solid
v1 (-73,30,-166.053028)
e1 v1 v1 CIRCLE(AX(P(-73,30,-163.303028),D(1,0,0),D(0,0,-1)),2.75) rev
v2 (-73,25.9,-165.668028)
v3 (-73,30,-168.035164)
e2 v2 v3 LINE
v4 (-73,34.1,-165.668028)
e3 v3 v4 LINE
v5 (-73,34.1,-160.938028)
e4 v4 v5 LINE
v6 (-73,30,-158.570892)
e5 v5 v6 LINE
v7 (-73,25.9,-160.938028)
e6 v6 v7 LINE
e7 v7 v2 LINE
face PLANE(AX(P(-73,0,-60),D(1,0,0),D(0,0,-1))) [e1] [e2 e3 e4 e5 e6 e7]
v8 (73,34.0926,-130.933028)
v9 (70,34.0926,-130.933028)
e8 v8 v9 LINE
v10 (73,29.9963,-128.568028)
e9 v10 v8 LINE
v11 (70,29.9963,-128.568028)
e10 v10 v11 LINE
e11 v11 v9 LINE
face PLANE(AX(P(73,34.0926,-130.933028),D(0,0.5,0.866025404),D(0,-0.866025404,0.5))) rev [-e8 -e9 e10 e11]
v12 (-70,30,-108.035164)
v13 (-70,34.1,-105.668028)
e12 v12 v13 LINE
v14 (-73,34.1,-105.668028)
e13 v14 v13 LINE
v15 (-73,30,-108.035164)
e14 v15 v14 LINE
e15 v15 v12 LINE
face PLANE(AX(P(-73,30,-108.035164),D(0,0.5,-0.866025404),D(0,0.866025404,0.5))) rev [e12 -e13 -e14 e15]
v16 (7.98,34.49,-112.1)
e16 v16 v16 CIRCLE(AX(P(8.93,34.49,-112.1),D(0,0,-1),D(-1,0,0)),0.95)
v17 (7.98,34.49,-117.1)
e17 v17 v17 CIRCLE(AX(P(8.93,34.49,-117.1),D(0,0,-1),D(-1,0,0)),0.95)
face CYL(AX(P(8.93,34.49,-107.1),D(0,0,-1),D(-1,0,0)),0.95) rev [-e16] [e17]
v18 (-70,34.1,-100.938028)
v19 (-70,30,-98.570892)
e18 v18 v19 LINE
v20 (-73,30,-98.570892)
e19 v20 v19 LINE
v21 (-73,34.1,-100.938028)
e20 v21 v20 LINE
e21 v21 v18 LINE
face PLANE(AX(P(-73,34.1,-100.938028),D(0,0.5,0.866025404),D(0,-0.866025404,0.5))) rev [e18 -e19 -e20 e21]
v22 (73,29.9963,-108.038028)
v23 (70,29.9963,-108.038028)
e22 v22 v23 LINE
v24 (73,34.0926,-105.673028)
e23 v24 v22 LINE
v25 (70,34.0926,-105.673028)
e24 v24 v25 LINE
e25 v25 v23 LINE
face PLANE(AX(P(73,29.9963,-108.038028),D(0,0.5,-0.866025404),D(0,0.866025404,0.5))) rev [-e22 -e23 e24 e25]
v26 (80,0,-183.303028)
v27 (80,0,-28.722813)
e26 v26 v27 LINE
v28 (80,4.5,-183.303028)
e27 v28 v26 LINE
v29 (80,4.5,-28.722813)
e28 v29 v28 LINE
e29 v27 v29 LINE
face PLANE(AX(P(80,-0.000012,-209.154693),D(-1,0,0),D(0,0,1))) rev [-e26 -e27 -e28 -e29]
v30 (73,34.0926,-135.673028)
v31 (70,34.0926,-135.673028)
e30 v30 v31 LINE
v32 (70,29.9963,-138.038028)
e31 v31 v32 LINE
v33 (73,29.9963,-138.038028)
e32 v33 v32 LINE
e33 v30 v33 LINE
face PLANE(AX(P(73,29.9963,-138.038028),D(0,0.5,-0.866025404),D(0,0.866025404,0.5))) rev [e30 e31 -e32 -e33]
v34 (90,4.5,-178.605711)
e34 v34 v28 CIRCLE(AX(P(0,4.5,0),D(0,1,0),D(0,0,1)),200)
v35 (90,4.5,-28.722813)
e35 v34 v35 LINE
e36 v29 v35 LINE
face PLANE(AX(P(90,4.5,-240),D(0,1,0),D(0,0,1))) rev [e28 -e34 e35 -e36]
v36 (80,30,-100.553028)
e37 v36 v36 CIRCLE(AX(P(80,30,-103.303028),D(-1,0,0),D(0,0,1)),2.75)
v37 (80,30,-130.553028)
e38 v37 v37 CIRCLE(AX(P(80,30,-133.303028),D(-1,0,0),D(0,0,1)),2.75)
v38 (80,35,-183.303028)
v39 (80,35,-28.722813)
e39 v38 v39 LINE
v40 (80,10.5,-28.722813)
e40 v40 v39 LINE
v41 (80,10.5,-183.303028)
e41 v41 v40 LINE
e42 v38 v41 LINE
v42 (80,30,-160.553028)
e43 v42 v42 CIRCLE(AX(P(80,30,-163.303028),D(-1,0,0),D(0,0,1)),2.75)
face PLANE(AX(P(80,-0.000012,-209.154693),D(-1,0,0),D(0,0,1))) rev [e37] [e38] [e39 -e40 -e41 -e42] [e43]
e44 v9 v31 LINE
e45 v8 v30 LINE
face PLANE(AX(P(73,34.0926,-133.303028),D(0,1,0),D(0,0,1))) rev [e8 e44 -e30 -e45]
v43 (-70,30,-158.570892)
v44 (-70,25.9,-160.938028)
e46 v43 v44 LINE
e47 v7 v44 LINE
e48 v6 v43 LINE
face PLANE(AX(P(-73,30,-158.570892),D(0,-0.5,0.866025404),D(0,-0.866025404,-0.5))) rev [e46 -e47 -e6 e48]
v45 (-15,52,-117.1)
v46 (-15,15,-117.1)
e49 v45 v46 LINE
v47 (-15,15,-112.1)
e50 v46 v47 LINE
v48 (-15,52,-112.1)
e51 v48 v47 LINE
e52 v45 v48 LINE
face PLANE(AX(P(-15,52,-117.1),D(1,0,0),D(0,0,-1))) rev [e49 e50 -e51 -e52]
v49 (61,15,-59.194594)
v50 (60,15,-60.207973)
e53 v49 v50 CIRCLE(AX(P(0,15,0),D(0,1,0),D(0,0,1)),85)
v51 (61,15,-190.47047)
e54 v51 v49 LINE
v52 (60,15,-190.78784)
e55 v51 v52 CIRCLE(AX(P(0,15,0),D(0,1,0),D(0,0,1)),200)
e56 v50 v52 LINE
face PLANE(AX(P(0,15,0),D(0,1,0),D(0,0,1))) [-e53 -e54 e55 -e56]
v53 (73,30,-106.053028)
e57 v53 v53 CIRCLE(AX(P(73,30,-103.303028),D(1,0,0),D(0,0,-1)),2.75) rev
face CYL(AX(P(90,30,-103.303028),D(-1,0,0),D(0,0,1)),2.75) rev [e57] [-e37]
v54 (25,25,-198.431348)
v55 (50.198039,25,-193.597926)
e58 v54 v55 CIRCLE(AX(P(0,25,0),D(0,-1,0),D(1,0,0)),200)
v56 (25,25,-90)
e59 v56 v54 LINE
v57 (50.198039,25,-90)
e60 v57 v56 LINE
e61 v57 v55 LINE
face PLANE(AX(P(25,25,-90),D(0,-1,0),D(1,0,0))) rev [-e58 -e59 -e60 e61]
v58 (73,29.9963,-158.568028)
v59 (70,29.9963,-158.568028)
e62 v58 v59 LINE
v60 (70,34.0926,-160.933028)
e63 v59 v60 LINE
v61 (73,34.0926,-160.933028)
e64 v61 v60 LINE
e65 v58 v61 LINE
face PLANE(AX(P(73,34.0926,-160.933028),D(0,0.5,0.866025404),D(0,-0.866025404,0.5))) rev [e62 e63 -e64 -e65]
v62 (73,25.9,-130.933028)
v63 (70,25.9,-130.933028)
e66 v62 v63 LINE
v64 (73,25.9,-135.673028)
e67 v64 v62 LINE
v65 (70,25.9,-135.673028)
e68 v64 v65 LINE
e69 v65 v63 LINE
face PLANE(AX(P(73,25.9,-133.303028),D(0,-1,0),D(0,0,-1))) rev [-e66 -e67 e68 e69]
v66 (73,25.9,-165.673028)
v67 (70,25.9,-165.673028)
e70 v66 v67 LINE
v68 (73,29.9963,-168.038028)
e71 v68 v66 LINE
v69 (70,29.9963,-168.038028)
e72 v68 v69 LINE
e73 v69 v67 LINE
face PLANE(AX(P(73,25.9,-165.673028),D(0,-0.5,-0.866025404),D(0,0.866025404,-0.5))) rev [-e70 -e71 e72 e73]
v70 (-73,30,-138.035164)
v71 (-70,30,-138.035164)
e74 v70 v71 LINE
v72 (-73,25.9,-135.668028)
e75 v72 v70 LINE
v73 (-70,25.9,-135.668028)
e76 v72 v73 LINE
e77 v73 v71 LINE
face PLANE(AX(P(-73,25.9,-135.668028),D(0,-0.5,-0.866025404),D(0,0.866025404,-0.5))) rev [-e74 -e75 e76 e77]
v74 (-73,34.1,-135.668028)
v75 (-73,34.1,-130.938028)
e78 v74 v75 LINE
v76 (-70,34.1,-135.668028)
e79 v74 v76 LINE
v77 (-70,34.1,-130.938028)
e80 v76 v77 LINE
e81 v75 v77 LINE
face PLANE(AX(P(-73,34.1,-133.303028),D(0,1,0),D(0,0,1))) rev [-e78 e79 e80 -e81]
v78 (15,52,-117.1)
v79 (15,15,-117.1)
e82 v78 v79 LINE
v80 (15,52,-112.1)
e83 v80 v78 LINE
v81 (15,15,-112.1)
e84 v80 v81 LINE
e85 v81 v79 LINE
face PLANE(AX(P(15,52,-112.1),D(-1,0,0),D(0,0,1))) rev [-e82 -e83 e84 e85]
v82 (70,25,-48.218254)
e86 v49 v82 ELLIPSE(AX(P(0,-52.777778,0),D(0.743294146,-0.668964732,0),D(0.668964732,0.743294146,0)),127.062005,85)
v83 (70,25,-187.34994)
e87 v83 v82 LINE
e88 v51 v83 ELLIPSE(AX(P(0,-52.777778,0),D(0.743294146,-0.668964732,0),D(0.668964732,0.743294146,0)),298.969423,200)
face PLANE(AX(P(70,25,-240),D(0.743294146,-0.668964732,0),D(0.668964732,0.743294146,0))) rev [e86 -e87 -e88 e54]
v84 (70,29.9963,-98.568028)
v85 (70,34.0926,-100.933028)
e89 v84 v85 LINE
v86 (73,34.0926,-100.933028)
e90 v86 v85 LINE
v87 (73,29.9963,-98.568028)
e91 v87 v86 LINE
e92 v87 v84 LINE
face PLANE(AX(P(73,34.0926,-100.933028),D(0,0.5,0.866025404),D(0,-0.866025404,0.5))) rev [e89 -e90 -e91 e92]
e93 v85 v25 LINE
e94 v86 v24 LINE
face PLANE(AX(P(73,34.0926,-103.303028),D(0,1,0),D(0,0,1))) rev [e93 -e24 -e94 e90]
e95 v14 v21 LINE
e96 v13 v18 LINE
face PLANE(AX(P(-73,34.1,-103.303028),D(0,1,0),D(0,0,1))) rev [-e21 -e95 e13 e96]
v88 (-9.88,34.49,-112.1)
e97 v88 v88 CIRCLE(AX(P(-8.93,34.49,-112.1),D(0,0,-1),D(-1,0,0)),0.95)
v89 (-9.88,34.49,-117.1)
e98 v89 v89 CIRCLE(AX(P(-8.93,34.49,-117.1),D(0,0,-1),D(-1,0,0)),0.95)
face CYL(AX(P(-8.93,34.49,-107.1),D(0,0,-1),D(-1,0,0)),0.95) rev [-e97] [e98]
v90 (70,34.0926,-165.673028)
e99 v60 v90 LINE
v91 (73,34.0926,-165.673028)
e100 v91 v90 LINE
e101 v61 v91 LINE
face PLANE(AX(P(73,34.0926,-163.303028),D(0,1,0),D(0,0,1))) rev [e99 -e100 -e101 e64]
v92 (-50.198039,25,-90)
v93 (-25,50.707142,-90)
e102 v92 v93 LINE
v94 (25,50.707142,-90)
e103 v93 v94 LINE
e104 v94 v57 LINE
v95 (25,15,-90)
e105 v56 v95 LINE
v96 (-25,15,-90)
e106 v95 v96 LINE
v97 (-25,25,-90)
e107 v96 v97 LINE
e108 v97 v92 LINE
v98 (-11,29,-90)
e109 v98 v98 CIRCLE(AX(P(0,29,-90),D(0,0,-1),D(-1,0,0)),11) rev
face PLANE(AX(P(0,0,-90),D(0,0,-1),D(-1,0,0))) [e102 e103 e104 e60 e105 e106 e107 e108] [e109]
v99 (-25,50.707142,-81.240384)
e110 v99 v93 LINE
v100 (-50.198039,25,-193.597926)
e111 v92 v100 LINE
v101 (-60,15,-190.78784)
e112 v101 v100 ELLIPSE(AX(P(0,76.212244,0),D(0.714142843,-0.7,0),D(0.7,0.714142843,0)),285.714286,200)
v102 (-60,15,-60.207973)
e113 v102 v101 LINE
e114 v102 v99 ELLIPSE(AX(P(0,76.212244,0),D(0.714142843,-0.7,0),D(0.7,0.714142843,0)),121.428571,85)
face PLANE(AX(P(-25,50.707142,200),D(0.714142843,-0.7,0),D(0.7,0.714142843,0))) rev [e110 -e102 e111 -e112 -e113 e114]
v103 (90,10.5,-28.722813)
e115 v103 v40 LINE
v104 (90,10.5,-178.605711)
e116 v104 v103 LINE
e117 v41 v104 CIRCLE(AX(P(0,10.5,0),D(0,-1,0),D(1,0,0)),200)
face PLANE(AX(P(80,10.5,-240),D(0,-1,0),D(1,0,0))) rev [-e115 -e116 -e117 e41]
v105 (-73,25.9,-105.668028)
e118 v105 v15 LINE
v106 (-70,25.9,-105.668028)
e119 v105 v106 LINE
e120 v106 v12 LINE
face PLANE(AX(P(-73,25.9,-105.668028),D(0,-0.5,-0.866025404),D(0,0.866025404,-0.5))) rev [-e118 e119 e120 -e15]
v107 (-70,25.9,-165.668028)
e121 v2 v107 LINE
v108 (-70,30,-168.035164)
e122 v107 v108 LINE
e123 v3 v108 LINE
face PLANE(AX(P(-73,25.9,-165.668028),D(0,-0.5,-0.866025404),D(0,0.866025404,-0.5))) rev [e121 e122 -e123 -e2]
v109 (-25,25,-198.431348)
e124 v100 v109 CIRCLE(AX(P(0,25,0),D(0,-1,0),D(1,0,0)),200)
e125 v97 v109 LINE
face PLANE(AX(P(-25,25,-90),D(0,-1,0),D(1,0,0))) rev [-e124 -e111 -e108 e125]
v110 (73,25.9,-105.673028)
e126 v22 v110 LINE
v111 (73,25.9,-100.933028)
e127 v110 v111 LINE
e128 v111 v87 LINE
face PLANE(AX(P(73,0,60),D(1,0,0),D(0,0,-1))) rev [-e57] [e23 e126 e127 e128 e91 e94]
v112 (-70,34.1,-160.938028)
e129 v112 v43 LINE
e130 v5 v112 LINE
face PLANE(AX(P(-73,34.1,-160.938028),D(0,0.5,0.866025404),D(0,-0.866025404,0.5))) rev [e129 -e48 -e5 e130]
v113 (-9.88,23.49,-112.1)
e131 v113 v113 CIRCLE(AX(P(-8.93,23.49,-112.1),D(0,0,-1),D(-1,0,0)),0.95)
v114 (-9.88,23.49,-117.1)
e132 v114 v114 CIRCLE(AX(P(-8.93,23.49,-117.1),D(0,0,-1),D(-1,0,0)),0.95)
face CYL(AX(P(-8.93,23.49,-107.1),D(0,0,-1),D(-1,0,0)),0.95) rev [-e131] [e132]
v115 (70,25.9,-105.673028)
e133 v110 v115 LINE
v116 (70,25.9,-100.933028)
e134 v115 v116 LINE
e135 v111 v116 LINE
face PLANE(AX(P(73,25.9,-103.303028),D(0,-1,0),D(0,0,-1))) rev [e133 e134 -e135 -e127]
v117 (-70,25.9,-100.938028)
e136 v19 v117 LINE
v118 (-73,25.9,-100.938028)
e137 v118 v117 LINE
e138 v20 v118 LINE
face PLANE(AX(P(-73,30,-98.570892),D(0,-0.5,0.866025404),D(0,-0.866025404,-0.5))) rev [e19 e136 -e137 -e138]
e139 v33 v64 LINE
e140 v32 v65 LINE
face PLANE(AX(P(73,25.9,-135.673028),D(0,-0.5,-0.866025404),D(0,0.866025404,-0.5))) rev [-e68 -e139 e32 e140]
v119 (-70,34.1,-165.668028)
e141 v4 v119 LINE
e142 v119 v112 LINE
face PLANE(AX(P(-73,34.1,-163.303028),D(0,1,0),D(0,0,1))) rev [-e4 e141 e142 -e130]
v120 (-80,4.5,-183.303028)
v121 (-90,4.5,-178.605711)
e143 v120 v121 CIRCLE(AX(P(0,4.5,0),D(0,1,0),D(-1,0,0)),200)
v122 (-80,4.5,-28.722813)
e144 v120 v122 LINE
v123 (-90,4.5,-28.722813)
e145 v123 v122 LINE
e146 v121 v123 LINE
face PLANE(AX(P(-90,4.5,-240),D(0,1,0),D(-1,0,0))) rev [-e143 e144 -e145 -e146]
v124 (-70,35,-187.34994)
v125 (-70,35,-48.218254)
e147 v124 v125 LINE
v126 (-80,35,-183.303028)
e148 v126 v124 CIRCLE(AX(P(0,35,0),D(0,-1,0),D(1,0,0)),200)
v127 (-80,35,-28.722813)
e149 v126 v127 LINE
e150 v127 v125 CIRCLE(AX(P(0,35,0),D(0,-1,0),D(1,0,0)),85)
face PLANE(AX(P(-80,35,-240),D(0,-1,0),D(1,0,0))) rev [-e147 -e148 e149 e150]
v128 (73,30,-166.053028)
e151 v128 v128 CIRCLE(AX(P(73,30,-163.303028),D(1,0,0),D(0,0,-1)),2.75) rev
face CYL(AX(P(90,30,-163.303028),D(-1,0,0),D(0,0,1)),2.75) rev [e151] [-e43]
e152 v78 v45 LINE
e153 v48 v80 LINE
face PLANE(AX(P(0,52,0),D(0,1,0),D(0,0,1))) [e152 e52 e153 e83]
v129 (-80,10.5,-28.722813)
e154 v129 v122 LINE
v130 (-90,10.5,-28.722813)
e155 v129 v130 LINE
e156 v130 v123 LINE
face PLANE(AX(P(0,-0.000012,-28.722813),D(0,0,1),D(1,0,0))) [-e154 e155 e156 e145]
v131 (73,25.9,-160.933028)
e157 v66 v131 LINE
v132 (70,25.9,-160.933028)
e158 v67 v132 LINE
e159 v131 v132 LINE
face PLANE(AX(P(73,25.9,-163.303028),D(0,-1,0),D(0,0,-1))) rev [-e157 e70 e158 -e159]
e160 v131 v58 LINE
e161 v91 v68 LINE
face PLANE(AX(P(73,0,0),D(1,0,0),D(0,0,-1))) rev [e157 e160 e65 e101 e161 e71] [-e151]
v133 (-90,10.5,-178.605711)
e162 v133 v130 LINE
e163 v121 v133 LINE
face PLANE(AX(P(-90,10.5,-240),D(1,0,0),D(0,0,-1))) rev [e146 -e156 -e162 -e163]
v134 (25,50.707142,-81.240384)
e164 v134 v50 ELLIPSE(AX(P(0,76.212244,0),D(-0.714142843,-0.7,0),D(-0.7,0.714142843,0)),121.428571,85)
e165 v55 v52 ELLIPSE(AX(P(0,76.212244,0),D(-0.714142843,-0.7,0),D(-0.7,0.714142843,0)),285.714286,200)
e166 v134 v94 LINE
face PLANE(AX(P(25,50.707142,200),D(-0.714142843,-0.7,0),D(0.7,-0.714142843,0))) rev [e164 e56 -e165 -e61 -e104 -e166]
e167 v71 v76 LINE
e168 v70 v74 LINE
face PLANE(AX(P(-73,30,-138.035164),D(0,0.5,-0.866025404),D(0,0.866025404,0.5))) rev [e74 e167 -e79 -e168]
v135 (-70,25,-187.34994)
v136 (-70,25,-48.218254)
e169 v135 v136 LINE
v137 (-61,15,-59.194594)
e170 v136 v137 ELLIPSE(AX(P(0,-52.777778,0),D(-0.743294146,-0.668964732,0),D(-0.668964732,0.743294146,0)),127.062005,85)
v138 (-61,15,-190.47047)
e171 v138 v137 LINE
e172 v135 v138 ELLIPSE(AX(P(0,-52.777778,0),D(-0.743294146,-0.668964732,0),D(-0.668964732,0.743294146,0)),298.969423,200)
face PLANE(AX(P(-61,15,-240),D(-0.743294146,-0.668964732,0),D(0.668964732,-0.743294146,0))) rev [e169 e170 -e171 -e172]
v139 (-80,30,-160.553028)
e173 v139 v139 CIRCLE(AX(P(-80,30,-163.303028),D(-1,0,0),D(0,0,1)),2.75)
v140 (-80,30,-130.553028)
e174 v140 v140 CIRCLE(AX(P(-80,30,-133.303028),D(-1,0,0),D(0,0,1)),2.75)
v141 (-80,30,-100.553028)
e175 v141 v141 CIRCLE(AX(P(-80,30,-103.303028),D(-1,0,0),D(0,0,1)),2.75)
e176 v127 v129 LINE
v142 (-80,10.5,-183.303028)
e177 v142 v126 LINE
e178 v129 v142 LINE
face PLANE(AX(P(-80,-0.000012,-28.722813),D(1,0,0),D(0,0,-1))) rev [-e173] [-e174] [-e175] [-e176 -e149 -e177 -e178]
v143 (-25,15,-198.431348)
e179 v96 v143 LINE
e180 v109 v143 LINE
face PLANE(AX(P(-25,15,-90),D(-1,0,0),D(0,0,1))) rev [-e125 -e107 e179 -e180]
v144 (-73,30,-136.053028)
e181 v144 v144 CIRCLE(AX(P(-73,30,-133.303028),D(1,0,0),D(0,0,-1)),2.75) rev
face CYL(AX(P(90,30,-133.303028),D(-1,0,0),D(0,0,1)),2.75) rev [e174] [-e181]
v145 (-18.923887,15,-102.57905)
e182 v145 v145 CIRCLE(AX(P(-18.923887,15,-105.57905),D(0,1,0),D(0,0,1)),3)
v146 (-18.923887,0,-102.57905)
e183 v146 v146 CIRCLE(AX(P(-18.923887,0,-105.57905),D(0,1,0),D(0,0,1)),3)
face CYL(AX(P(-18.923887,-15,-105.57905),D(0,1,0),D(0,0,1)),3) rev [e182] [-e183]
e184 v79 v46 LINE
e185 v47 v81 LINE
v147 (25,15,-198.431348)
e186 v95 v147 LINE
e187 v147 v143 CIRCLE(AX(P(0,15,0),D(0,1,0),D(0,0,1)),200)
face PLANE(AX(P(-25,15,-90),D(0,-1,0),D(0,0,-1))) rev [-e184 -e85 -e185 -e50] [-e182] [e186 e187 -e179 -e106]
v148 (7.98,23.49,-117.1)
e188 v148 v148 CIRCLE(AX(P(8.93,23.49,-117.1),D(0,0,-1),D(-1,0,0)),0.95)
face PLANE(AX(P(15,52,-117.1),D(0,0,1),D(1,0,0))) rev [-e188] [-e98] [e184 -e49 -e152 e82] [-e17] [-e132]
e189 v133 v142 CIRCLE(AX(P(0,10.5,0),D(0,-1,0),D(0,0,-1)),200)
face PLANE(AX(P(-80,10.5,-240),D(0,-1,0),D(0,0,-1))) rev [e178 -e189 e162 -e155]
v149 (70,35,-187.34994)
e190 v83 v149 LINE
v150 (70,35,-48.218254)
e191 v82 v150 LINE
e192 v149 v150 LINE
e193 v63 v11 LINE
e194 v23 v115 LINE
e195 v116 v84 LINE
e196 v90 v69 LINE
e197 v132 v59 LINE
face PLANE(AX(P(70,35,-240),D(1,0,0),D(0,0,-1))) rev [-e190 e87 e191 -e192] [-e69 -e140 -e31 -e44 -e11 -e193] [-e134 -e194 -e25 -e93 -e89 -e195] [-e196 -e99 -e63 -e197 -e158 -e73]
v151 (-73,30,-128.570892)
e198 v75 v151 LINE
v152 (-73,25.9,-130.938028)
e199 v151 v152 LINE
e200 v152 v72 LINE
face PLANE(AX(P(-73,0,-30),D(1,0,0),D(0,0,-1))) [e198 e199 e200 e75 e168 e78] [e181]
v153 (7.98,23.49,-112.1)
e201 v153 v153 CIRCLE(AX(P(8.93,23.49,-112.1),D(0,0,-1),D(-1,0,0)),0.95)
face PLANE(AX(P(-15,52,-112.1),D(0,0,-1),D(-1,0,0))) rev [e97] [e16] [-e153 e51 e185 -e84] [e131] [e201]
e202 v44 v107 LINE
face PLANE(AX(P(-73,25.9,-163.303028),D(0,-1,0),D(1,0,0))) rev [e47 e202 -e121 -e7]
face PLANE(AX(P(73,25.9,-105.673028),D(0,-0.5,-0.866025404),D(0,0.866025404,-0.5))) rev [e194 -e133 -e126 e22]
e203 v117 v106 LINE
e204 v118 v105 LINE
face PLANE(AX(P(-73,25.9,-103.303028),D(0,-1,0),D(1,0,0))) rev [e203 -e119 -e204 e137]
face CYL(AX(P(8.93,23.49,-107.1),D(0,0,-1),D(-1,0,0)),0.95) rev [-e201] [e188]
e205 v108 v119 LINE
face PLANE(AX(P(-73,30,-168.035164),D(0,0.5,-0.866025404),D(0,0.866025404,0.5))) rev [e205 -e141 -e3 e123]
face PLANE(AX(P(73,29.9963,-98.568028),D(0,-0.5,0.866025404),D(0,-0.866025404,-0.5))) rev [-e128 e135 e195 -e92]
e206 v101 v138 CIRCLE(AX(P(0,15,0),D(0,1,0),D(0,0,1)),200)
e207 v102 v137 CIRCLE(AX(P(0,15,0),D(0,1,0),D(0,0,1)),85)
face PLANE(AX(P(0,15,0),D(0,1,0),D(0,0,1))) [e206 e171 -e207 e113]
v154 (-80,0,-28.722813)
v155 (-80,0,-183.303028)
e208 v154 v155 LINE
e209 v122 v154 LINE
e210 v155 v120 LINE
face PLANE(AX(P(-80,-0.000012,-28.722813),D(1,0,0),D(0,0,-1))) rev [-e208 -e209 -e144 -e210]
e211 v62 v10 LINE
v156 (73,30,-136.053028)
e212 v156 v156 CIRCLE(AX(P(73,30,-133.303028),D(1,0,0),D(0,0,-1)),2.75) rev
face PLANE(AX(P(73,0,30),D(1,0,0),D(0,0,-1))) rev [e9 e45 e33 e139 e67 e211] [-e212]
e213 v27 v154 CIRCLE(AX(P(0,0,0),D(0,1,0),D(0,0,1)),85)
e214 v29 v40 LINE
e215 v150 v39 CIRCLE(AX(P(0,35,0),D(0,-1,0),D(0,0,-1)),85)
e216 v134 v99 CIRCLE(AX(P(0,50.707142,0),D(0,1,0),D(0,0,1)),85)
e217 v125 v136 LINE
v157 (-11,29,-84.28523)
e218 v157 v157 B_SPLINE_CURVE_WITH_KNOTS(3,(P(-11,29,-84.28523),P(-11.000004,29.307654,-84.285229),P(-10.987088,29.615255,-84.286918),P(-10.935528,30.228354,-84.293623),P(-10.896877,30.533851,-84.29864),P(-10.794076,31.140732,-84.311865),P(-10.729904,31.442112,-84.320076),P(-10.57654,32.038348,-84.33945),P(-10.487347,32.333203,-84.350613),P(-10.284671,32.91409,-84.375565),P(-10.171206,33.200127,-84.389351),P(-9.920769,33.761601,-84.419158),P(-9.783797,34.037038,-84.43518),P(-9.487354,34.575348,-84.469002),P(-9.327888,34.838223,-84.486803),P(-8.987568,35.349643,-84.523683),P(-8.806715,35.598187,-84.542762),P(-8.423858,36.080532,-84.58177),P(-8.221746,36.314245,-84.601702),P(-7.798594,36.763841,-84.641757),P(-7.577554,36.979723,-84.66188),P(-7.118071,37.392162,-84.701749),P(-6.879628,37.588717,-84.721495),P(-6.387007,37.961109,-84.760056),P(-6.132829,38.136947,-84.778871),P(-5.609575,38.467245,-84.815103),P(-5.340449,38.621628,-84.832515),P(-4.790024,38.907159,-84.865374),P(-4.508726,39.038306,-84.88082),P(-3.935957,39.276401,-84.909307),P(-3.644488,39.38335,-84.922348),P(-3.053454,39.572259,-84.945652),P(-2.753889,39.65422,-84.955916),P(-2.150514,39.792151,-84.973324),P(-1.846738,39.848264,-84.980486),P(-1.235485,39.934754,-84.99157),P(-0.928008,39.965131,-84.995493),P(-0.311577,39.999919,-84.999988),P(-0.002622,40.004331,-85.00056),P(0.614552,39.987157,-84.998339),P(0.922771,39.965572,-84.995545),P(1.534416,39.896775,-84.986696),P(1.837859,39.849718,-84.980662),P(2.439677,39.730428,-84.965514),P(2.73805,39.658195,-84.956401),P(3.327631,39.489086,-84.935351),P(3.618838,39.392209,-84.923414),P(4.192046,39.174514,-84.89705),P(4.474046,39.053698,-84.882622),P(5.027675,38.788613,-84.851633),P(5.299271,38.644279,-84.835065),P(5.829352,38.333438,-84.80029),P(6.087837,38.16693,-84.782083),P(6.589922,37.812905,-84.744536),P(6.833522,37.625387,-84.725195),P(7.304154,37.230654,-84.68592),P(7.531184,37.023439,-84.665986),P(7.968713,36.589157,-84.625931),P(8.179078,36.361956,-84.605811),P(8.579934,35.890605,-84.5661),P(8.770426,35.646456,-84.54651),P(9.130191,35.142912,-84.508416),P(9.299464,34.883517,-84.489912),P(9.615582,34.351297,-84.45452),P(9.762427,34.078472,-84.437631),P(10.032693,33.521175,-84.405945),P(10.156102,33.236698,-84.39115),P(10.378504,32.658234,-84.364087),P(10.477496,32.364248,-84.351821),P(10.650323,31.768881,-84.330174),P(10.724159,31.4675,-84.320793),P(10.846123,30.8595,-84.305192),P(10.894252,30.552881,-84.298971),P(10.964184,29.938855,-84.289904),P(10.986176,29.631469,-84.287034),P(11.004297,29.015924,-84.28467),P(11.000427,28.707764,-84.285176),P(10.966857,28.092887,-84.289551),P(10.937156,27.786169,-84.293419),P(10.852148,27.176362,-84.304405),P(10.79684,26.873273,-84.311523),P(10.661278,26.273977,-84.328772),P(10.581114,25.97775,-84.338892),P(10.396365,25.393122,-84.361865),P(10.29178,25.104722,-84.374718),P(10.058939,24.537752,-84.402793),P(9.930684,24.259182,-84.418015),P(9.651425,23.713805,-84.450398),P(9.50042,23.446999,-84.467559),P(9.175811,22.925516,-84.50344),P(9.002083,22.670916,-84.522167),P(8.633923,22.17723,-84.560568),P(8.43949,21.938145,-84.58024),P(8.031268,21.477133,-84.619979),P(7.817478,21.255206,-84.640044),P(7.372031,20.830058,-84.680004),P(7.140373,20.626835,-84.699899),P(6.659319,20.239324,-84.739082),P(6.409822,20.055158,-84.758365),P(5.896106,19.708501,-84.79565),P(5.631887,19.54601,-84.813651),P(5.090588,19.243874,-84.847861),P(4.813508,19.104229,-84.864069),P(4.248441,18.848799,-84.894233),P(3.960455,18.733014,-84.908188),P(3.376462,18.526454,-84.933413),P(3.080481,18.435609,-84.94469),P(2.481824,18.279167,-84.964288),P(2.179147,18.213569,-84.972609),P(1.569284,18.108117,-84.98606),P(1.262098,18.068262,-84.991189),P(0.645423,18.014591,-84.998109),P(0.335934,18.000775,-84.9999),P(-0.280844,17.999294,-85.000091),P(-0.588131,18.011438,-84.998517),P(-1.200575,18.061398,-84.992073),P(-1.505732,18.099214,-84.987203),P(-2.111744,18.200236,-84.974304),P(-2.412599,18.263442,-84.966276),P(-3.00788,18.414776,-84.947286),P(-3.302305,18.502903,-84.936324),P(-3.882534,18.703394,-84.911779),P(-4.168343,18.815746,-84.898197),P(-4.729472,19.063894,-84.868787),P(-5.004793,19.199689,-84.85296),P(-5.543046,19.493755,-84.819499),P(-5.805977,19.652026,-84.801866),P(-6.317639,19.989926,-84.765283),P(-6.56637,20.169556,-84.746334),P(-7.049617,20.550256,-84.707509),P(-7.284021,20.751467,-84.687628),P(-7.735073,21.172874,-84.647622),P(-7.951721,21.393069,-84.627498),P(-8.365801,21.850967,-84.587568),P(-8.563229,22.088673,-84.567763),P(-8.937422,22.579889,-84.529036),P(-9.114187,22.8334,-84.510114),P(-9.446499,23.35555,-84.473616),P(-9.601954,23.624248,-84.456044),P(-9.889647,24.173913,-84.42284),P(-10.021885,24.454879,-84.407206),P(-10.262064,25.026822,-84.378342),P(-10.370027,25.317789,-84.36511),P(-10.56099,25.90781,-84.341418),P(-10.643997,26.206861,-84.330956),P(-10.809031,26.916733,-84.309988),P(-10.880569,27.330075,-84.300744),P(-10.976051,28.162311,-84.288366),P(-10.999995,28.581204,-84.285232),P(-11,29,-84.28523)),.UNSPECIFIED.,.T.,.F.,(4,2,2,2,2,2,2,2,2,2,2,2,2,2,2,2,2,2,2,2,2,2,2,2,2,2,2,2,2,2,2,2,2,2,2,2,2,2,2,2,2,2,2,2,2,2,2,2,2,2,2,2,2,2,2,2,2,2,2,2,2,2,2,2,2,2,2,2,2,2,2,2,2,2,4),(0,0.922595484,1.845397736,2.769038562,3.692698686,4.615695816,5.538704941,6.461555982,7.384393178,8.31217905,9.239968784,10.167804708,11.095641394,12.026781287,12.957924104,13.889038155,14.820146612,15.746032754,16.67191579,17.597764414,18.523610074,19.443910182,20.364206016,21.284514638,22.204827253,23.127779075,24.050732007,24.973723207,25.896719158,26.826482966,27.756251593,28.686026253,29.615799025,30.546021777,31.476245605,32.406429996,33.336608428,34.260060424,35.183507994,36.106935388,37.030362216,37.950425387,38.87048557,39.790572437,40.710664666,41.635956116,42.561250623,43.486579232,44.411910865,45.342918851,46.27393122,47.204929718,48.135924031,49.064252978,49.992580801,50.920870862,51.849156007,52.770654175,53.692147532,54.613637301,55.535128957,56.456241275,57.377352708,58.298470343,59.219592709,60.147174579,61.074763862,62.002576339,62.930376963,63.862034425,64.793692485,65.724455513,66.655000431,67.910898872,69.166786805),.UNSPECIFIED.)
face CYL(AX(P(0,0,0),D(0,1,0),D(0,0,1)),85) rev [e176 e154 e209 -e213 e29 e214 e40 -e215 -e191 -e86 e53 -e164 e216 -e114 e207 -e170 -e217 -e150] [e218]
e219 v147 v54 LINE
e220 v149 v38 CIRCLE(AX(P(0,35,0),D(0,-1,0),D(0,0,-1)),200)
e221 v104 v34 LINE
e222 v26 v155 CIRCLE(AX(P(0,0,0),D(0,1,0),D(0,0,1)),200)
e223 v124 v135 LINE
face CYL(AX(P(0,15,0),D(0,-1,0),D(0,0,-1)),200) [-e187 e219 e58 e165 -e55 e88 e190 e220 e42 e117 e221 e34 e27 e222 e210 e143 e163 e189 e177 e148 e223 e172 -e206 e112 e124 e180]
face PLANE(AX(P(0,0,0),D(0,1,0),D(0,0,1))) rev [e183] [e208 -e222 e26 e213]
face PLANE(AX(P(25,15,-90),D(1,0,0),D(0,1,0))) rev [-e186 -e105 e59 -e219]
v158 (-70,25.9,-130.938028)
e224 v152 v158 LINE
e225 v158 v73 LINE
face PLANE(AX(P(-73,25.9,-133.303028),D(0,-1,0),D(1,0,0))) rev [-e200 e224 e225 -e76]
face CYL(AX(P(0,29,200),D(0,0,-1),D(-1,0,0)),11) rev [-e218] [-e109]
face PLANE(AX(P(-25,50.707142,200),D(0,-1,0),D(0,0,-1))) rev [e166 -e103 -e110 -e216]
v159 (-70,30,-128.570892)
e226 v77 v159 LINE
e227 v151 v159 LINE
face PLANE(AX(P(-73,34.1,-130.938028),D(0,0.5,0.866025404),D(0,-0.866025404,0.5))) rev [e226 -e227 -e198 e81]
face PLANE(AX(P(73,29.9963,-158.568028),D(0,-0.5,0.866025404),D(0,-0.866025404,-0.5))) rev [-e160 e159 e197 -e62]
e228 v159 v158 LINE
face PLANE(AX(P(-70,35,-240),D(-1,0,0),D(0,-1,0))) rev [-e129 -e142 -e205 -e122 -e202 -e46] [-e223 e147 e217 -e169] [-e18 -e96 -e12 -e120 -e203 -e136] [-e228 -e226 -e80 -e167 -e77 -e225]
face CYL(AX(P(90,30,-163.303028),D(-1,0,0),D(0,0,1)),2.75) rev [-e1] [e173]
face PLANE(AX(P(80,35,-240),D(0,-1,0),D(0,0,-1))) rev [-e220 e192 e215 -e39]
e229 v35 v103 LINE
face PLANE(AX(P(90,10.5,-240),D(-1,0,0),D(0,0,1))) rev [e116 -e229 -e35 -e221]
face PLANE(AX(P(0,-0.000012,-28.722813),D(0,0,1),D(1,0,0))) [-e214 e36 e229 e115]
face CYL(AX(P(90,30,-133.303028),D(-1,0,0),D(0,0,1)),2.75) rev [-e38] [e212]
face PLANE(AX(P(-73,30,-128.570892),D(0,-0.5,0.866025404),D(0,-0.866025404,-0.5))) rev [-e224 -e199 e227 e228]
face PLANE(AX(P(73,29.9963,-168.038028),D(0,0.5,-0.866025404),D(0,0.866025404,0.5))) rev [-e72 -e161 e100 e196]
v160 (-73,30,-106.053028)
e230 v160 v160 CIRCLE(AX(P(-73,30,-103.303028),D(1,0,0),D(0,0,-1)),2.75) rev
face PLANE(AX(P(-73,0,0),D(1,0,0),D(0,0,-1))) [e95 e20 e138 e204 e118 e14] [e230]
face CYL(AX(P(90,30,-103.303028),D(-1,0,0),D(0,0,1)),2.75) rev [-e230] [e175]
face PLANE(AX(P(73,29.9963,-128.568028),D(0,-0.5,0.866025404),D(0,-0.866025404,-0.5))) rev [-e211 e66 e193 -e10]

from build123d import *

# Parameters (mm, degrees)
SKETCH1_R                = 200
BOSS_EXTRUDE1_DEPTH      = 15
BOSS_EXTRUDE2_DEPTH      = 200
CUT_EXTRUDE1_DEPTH       = 286.087705803
CUT_EXTRUDE1_DEPTH_BACK  = 286.087705803
SKETCH3_R                = 85
CUT_EXTRUDE2_DEPTH       = 451.079120005
CUT_EXTRUDE2_DEPTH_BACK  = 451.079120005
SKETCH4_R                = 11
CUT_EXTRUDE3_DEPTH       = 451.079120105
CUT_EXTRUDE3_DEPTH_BACK  = 110
CUT_EXTRUDE4_DEPTH       = 110
BOSS_EXTRUDE3_DEPTH      = 200
CUT_EXTRUDE5_DEPTH       = 286.087705815
CUT_EXTRUDE5_DEPTH_BACK  = 286.087705815
SKETCH7_OUTSIDE_W        = 515.59
SKETCH7_OUTSIDE_H        = 515.59
SKETCH7_OUTSIDE_R        = 200
SKETCH9_R                = 4
BOSS_EXTRUDE4_DEPTH      = 220
CUT_EXTRUDE6_DEPTH       = 190
SKETCH11_R               = 3
CUT_EXTRUDE7_DEPTH       = 486.974499745
CUT_EXTRUDE8_DEPTH       = 302.61434707
CUT_EXTRUDE8_DEPTH_BACK  = 302.61434707
BOSS_EXTRUDE5_DEPTH      = 150
CUT_EXTRUDE9_DEPTH       = 262.287608345
CUT_EXTRUDE9_DEPTH_BACK  = 262.287608345
CUT_EXTRUDE10_DEPTH      = 259.795285906
CUT_EXTRUDE10_DEPTH_BACK = 259.795285906
SKETCH18_R               = 85
CUT_EXTRUDE11_START      = -15
CUT_EXTRUDE11_DEPTH      = 35
SKETCH20_R               = 2.75
CUT_EXTRUDE12_DEPTH      = 268.341007469
SKETCH21_W               = 30
SKETCH21_H               = 5
BOSS_EXTRUDE6_DEPTH      = 37
SKETCH22_R               = 0.95
CUT_EXTRUDE13_DEPTH      = 10
CUT_EXTRUDE14_DEPTH      = 3
LPATTERN1_COUNT          = 3
LPATTERN1_PITCH          = 30
CUT_EXTRUDE15_DEPTH      = 3
LPATTERN2_COUNT          = 3
LPATTERN2_PITCH          = 30
SKETCH25_R               = 3
CUT_EXTRUDE16_DEPTH      = 30


# Read off the part's stored shape, not the designer's step: Cut-Extrude11
with BuildPart() as part:
    # Sketch1 → Boss-Extrude1 (new body)
    with BuildSketch(Plane(origin=(0, 0, 0), x_dir=(1, 0, 0), z_dir=(0, 1, 0))):
        with Locations(Location((0, 0, 0), (0, 0, 270))):
            Circle(SKETCH1_R)
    extrude(amount=BOSS_EXTRUDE1_DEPTH)

    # Sketch2 → Boss-Extrude2 (add, symmetric)
    with BuildSketch(Plane.XY):
        Polygon((-25, 50.707142143), (25, 50.707142143), (60, 15), (-60, 15), align=None)
    extrude(amount=BOSS_EXTRUDE2_DEPTH, both=True)

    # Sketch3 → Cut-Extrude1 (cut, two sides: drawn at the far end of the back side and taken through both)
    with BuildSketch(Plane(origin=(0, 15, 0), x_dir=(1, 0, 0), z_dir=(0, 1, 0)).offset(-CUT_EXTRUDE1_DEPTH_BACK)):
        with Locations(Location((0, 0, 0), (0, 0, 270))):
            Circle(SKETCH3_R)
    extrude(amount=CUT_EXTRUDE1_DEPTH + CUT_EXTRUDE1_DEPTH_BACK, mode=Mode.SUBTRACT)

    # Sketch4 → Cut-Extrude2 (cut, two sides: drawn at the far end of the back side and taken through both)
    with BuildSketch(Plane(origin=(0, 0, -200), x_dir=(-1, 0, 0), z_dir=(0, 0, -1)).offset(-CUT_EXTRUDE2_DEPTH_BACK)):
        with Locations((0, 29)):
            Circle(SKETCH4_R)
    extrude(amount=CUT_EXTRUDE2_DEPTH + CUT_EXTRUDE2_DEPTH_BACK, mode=Mode.SUBTRACT)

    # Sketch5 → Cut-Extrude3 (cut, two sides: drawn at the far end of the back side and taken through both)
    with BuildSketch(Plane.XY.offset(200).offset(-CUT_EXTRUDE3_DEPTH_BACK)):
        Polygon((-25, 50.707142143), (25, 50.707142143), (50.198039412, 25), (25, 25), (25, 15), (-25, 15), (-25, 25), (-50.198039412, 25), align=None)
    extrude(amount=CUT_EXTRUDE3_DEPTH + CUT_EXTRUDE3_DEPTH_BACK, mode=Mode.SUBTRACT)

    # Sketch6 → Cut-Extrude4 (cut)
    with BuildSketch(Plane(origin=(0, 0, -200), x_dir=(-1, 0, 0), z_dir=(0, 0, -1))):
        Polygon((-25, 50.707142143), (25, 50.707142143), (50.198039412, 25), (25, 25), (25, 15), (-25, 15), (-25, 25), (-50.198039412, 25), align=None)
    extrude(amount=-CUT_EXTRUDE4_DEPTH, mode=Mode.SUBTRACT)

    # Sketch8 → Boss-Extrude3 (add, symmetric)
    with BuildSketch(Plane(origin=(0, 0, 0), x_dir=(0, 0, -1), z_dir=(1, 0, 0))):
        Polygon((0, 15), (-20, 15), (-10, 35.712315177), (10, 35.712315177), (20, 15), align=None)
    extrude(amount=BOSS_EXTRUDE3_DEPTH, both=True)

    # Sketch7 outside → Cut-Extrude5 (cut, two sides: drawn at the far end of the back side and taken through both)
    with BuildSketch(Plane(origin=(0, 15, 0), x_dir=(1, 0, 0), z_dir=(0, 1, 0)).offset(-CUT_EXTRUDE5_DEPTH_BACK)):
        Rectangle(SKETCH7_OUTSIDE_W, SKETCH7_OUTSIDE_H)
        with Locations(Location((0, 0, 0), (0, 0, 97.180755781))):
            Circle(SKETCH7_OUTSIDE_R, mode=Mode.SUBTRACT)
    extrude(amount=CUT_EXTRUDE5_DEPTH + CUT_EXTRUDE5_DEPTH_BACK, mode=Mode.SUBTRACT)

    # Sketch9 → Boss-Extrude4 (add, symmetric)
    with BuildSketch(Plane(origin=(0, 0, 0), x_dir=(0, 0, -1), z_dir=(1, 0, 0))):
        with Locations(Location((0, 29, 0), (0, 0, 180))):
            Circle(SKETCH9_R)
    extrude(amount=BOSS_EXTRUDE4_DEPTH, both=True)

    # Sketch10 → Cut-Extrude6 (cut, symmetric)
    with BuildSketch(Plane(origin=(0, 0, 0), x_dir=(0, 0, -1), z_dir=(1, 0, 0))):
        Polygon((-20, 15), (20, 15), (10, 35.712315177), (-10, 35.712315177), align=None)
    extrude(amount=CUT_EXTRUDE6_DEPTH, both=True, mode=Mode.SUBTRACT)

    # Sketch11 → Cut-Extrude7 (cut, through all)
    with BuildSketch(Plane.ZY.offset(220)):
        with Locations((0, 29)):
            Circle(SKETCH11_R)
    extrude(amount=-CUT_EXTRUDE7_DEPTH, mode=Mode.SUBTRACT)

    # Sketch14 → Cut-Extrude8 (cut, two sides: drawn at the far end of the back side and taken through both)
    with BuildSketch(Plane(origin=(0, 0, 0), x_dir=(1, 0, 0), z_dir=(0, 1, 0)).offset(-CUT_EXTRUDE8_DEPTH_BACK)):
        Polygon((-80, 28.722813233), (-80, 204.683452683), (-270.013244013, 28.722813233), (-103.583737584, -216.10995611), (187.046893047, -216.10995611), (266.535612536, 150.034958035), (80, 209.154693155), (80, 28.722813233), align=None)
    extrude(amount=CUT_EXTRUDE8_DEPTH + CUT_EXTRUDE8_DEPTH_BACK, mode=Mode.SUBTRACT)

    # Sketch16 → Boss-Extrude5 (add, symmetric)
    with BuildSketch(Plane(origin=(0, 0, -90), x_dir=(-1, 0, 0), z_dir=(0, 0, -1))):
        Polygon((-80, 15), (-80, 35), (-70, 35), (-70, 25), (-61, 15), (-61, 0), (-80, 0), (-80, 4.5), (-90, 4.5), (-90, 10.5), (-80, 10.5), align=None)
        Polygon((80, 15), (80, 35), (70, 35), (70, 25), (61, 15), (61, 0), (80, 0), (80, 4.5), (90, 4.5), (90, 10.5), (80, 10.5), align=None)
    extrude(amount=BOSS_EXTRUDE5_DEPTH, both=True)

    # Sketch17 → Cut-Extrude9 (cut, two sides: drawn at the far end of the back side and taken through both)
    with BuildSketch(Plane(origin=(0, 0, 0), x_dir=(1, 0, 0), z_dir=(0, 1, 0)).offset(-CUT_EXTRUDE9_DEPTH_BACK)):
        Polygon((-80, 28.722813233), (-99.608008808, 28.722813233), (-99.608008808, -74.271563426), (112.245925984, -74.271563426), (112.245925984, 0), (109.222119936, 28.722813233), (80, 28.722813233), align=None)
    extrude(amount=CUT_EXTRUDE9_DEPTH + CUT_EXTRUDE9_DEPTH_BACK, mode=Mode.SUBTRACT)

    # Sketch18 → Cut-Extrude10 (cut, two sides: drawn at the far end of the back side and taken through both)
    with BuildSketch(Plane(origin=(0, 15, 0), x_dir=(1, 0, 0), z_dir=(0, 1, 0)).offset(-CUT_EXTRUDE10_DEPTH_BACK)):
        Circle(SKETCH18_R)
    extrude(amount=CUT_EXTRUDE10_DEPTH + CUT_EXTRUDE10_DEPTH_BACK, mode=Mode.SUBTRACT)

    # Cut-Extrude11 outline → Cut-Extrude11 (cut)
    with BuildSketch(Plane(origin=(0, 15, 0), x_dir=(1, 0, 0), z_dir=(0, 1, 0)).offset(CUT_EXTRUDE11_START)):
        with BuildLine():
            Line((61, 240), (61, 190.470470152))
            ThreePointArc((61, 190.470470152), (75.732708439, 185.106879593), (90, 178.605710995))
            Line((90, 178.605710995), (90, 240))
            Line((90, 240), (61, 240))
        make_face()
        with BuildLine():
            Line((-61, 190.470470152), (-61, 240))
            Line((-61, 240), (-90, 240))
            Line((-90, 240), (-90, 178.605710995))
            ThreePointArc((-90, 178.605710995), (-75.732708439, 185.106879593), (-61, 190.470470152))
        make_face()
    extrude(amount=CUT_EXTRUDE11_DEPTH, mode=Mode.SUBTRACT)

    # Sketch20 → Cut-Extrude12 (cut, through all)
    with BuildSketch(Plane.ZY.offset(80)):
        with Locations((-163.303027798, 30)):
            Circle(SKETCH20_R)
        with Locations((-103.303027798, 30)):
            Circle(SKETCH20_R)
        with Locations((-133.303027798, 30)):
            Circle(SKETCH20_R)
    extrude(amount=-CUT_EXTRUDE12_DEPTH, mode=Mode.SUBTRACT)

    # Sketch21 → Boss-Extrude6 (add)
    with BuildSketch(Plane(origin=(0, 15, 0), x_dir=(1, 0, 0), z_dir=(0, 1, 0))):
        with Locations((0, 114.6)):
            Rectangle(SKETCH21_W, SKETCH21_H)
    extrude(amount=BOSS_EXTRUDE6_DEPTH)

    # Sketch22 → Cut-Extrude13 (cut)
    with BuildSketch(Plane(origin=(0, 0, -117.1), x_dir=(-1, 0, 0), z_dir=(0, 0, -1))):
        with Locations((-8.93, 23.49)):
            Circle(SKETCH22_R)
        with Locations((8.93, 23.49)):
            Circle(SKETCH22_R)
        with Locations((8.93, 34.49)):
            Circle(SKETCH22_R)
        with Locations((-8.93, 34.49)):
            Circle(SKETCH22_R)
    extrude(amount=-CUT_EXTRUDE13_DEPTH, mode=Mode.SUBTRACT)

    # Sketch23 → Cut-Extrude14 (cut)
    with BuildSketch(Plane(origin=(-70, 0, 0), x_dir=(0, 0, -1), z_dir=(1, 0, 0))):
        Polygon((103.303027798, 34.1), (105.668027798, 34.1), (108.035163902, 30), (105.668027798, 25.9), (103.303027798, 25.9), (100.938027798, 25.9), (98.570891695, 30), (100.938027798, 34.1), align=None)
    cut_extrude14 = extrude(amount=-CUT_EXTRUDE14_DEPTH, mode=Mode.SUBTRACT)

    # LPattern1: Cut-Extrude14 ×3
    with Locations(*[(0, 0, -i * LPATTERN1_PITCH) for i in range(1, LPATTERN1_COUNT)]):
        add(cut_extrude14, mode=Mode.SUBTRACT)

    # Sketch24 → Cut-Extrude15 (cut)
    with BuildSketch(Plane.ZY.offset(-70)):
        Polygon((-163.303027798, 34.09260032), (-160.933027798, 34.09260032), (-158.568027798, 29.99630016), (-160.933027798, 25.9), (-163.303027798, 25.9), (-165.673027798, 25.9), (-168.038027798, 29.99630016), (-165.673027798, 34.09260032), align=None)
    cut_extrude15 = extrude(amount=-CUT_EXTRUDE15_DEPTH, mode=Mode.SUBTRACT)

    # LPattern2: Cut-Extrude15 ×3
    with Locations(*[(0, 0, i * LPATTERN2_PITCH) for i in range(1, LPATTERN2_COUNT)]):
        add(cut_extrude15, mode=Mode.SUBTRACT)

    # Sketch25 → Cut-Extrude16 (cut)
    with BuildSketch(Plane(origin=(0, 15, 0), x_dir=(1, 0, 0), z_dir=(0, 1, 0))):
        with Locations(Location((-18.923887281, 105.579050088, 0), (0, 0, 270))):
            Circle(SKETCH25_R)
    extrude(amount=-CUT_EXTRUDE16_DEPTH, mode=Mode.SUBTRACT)


solid = part.part
